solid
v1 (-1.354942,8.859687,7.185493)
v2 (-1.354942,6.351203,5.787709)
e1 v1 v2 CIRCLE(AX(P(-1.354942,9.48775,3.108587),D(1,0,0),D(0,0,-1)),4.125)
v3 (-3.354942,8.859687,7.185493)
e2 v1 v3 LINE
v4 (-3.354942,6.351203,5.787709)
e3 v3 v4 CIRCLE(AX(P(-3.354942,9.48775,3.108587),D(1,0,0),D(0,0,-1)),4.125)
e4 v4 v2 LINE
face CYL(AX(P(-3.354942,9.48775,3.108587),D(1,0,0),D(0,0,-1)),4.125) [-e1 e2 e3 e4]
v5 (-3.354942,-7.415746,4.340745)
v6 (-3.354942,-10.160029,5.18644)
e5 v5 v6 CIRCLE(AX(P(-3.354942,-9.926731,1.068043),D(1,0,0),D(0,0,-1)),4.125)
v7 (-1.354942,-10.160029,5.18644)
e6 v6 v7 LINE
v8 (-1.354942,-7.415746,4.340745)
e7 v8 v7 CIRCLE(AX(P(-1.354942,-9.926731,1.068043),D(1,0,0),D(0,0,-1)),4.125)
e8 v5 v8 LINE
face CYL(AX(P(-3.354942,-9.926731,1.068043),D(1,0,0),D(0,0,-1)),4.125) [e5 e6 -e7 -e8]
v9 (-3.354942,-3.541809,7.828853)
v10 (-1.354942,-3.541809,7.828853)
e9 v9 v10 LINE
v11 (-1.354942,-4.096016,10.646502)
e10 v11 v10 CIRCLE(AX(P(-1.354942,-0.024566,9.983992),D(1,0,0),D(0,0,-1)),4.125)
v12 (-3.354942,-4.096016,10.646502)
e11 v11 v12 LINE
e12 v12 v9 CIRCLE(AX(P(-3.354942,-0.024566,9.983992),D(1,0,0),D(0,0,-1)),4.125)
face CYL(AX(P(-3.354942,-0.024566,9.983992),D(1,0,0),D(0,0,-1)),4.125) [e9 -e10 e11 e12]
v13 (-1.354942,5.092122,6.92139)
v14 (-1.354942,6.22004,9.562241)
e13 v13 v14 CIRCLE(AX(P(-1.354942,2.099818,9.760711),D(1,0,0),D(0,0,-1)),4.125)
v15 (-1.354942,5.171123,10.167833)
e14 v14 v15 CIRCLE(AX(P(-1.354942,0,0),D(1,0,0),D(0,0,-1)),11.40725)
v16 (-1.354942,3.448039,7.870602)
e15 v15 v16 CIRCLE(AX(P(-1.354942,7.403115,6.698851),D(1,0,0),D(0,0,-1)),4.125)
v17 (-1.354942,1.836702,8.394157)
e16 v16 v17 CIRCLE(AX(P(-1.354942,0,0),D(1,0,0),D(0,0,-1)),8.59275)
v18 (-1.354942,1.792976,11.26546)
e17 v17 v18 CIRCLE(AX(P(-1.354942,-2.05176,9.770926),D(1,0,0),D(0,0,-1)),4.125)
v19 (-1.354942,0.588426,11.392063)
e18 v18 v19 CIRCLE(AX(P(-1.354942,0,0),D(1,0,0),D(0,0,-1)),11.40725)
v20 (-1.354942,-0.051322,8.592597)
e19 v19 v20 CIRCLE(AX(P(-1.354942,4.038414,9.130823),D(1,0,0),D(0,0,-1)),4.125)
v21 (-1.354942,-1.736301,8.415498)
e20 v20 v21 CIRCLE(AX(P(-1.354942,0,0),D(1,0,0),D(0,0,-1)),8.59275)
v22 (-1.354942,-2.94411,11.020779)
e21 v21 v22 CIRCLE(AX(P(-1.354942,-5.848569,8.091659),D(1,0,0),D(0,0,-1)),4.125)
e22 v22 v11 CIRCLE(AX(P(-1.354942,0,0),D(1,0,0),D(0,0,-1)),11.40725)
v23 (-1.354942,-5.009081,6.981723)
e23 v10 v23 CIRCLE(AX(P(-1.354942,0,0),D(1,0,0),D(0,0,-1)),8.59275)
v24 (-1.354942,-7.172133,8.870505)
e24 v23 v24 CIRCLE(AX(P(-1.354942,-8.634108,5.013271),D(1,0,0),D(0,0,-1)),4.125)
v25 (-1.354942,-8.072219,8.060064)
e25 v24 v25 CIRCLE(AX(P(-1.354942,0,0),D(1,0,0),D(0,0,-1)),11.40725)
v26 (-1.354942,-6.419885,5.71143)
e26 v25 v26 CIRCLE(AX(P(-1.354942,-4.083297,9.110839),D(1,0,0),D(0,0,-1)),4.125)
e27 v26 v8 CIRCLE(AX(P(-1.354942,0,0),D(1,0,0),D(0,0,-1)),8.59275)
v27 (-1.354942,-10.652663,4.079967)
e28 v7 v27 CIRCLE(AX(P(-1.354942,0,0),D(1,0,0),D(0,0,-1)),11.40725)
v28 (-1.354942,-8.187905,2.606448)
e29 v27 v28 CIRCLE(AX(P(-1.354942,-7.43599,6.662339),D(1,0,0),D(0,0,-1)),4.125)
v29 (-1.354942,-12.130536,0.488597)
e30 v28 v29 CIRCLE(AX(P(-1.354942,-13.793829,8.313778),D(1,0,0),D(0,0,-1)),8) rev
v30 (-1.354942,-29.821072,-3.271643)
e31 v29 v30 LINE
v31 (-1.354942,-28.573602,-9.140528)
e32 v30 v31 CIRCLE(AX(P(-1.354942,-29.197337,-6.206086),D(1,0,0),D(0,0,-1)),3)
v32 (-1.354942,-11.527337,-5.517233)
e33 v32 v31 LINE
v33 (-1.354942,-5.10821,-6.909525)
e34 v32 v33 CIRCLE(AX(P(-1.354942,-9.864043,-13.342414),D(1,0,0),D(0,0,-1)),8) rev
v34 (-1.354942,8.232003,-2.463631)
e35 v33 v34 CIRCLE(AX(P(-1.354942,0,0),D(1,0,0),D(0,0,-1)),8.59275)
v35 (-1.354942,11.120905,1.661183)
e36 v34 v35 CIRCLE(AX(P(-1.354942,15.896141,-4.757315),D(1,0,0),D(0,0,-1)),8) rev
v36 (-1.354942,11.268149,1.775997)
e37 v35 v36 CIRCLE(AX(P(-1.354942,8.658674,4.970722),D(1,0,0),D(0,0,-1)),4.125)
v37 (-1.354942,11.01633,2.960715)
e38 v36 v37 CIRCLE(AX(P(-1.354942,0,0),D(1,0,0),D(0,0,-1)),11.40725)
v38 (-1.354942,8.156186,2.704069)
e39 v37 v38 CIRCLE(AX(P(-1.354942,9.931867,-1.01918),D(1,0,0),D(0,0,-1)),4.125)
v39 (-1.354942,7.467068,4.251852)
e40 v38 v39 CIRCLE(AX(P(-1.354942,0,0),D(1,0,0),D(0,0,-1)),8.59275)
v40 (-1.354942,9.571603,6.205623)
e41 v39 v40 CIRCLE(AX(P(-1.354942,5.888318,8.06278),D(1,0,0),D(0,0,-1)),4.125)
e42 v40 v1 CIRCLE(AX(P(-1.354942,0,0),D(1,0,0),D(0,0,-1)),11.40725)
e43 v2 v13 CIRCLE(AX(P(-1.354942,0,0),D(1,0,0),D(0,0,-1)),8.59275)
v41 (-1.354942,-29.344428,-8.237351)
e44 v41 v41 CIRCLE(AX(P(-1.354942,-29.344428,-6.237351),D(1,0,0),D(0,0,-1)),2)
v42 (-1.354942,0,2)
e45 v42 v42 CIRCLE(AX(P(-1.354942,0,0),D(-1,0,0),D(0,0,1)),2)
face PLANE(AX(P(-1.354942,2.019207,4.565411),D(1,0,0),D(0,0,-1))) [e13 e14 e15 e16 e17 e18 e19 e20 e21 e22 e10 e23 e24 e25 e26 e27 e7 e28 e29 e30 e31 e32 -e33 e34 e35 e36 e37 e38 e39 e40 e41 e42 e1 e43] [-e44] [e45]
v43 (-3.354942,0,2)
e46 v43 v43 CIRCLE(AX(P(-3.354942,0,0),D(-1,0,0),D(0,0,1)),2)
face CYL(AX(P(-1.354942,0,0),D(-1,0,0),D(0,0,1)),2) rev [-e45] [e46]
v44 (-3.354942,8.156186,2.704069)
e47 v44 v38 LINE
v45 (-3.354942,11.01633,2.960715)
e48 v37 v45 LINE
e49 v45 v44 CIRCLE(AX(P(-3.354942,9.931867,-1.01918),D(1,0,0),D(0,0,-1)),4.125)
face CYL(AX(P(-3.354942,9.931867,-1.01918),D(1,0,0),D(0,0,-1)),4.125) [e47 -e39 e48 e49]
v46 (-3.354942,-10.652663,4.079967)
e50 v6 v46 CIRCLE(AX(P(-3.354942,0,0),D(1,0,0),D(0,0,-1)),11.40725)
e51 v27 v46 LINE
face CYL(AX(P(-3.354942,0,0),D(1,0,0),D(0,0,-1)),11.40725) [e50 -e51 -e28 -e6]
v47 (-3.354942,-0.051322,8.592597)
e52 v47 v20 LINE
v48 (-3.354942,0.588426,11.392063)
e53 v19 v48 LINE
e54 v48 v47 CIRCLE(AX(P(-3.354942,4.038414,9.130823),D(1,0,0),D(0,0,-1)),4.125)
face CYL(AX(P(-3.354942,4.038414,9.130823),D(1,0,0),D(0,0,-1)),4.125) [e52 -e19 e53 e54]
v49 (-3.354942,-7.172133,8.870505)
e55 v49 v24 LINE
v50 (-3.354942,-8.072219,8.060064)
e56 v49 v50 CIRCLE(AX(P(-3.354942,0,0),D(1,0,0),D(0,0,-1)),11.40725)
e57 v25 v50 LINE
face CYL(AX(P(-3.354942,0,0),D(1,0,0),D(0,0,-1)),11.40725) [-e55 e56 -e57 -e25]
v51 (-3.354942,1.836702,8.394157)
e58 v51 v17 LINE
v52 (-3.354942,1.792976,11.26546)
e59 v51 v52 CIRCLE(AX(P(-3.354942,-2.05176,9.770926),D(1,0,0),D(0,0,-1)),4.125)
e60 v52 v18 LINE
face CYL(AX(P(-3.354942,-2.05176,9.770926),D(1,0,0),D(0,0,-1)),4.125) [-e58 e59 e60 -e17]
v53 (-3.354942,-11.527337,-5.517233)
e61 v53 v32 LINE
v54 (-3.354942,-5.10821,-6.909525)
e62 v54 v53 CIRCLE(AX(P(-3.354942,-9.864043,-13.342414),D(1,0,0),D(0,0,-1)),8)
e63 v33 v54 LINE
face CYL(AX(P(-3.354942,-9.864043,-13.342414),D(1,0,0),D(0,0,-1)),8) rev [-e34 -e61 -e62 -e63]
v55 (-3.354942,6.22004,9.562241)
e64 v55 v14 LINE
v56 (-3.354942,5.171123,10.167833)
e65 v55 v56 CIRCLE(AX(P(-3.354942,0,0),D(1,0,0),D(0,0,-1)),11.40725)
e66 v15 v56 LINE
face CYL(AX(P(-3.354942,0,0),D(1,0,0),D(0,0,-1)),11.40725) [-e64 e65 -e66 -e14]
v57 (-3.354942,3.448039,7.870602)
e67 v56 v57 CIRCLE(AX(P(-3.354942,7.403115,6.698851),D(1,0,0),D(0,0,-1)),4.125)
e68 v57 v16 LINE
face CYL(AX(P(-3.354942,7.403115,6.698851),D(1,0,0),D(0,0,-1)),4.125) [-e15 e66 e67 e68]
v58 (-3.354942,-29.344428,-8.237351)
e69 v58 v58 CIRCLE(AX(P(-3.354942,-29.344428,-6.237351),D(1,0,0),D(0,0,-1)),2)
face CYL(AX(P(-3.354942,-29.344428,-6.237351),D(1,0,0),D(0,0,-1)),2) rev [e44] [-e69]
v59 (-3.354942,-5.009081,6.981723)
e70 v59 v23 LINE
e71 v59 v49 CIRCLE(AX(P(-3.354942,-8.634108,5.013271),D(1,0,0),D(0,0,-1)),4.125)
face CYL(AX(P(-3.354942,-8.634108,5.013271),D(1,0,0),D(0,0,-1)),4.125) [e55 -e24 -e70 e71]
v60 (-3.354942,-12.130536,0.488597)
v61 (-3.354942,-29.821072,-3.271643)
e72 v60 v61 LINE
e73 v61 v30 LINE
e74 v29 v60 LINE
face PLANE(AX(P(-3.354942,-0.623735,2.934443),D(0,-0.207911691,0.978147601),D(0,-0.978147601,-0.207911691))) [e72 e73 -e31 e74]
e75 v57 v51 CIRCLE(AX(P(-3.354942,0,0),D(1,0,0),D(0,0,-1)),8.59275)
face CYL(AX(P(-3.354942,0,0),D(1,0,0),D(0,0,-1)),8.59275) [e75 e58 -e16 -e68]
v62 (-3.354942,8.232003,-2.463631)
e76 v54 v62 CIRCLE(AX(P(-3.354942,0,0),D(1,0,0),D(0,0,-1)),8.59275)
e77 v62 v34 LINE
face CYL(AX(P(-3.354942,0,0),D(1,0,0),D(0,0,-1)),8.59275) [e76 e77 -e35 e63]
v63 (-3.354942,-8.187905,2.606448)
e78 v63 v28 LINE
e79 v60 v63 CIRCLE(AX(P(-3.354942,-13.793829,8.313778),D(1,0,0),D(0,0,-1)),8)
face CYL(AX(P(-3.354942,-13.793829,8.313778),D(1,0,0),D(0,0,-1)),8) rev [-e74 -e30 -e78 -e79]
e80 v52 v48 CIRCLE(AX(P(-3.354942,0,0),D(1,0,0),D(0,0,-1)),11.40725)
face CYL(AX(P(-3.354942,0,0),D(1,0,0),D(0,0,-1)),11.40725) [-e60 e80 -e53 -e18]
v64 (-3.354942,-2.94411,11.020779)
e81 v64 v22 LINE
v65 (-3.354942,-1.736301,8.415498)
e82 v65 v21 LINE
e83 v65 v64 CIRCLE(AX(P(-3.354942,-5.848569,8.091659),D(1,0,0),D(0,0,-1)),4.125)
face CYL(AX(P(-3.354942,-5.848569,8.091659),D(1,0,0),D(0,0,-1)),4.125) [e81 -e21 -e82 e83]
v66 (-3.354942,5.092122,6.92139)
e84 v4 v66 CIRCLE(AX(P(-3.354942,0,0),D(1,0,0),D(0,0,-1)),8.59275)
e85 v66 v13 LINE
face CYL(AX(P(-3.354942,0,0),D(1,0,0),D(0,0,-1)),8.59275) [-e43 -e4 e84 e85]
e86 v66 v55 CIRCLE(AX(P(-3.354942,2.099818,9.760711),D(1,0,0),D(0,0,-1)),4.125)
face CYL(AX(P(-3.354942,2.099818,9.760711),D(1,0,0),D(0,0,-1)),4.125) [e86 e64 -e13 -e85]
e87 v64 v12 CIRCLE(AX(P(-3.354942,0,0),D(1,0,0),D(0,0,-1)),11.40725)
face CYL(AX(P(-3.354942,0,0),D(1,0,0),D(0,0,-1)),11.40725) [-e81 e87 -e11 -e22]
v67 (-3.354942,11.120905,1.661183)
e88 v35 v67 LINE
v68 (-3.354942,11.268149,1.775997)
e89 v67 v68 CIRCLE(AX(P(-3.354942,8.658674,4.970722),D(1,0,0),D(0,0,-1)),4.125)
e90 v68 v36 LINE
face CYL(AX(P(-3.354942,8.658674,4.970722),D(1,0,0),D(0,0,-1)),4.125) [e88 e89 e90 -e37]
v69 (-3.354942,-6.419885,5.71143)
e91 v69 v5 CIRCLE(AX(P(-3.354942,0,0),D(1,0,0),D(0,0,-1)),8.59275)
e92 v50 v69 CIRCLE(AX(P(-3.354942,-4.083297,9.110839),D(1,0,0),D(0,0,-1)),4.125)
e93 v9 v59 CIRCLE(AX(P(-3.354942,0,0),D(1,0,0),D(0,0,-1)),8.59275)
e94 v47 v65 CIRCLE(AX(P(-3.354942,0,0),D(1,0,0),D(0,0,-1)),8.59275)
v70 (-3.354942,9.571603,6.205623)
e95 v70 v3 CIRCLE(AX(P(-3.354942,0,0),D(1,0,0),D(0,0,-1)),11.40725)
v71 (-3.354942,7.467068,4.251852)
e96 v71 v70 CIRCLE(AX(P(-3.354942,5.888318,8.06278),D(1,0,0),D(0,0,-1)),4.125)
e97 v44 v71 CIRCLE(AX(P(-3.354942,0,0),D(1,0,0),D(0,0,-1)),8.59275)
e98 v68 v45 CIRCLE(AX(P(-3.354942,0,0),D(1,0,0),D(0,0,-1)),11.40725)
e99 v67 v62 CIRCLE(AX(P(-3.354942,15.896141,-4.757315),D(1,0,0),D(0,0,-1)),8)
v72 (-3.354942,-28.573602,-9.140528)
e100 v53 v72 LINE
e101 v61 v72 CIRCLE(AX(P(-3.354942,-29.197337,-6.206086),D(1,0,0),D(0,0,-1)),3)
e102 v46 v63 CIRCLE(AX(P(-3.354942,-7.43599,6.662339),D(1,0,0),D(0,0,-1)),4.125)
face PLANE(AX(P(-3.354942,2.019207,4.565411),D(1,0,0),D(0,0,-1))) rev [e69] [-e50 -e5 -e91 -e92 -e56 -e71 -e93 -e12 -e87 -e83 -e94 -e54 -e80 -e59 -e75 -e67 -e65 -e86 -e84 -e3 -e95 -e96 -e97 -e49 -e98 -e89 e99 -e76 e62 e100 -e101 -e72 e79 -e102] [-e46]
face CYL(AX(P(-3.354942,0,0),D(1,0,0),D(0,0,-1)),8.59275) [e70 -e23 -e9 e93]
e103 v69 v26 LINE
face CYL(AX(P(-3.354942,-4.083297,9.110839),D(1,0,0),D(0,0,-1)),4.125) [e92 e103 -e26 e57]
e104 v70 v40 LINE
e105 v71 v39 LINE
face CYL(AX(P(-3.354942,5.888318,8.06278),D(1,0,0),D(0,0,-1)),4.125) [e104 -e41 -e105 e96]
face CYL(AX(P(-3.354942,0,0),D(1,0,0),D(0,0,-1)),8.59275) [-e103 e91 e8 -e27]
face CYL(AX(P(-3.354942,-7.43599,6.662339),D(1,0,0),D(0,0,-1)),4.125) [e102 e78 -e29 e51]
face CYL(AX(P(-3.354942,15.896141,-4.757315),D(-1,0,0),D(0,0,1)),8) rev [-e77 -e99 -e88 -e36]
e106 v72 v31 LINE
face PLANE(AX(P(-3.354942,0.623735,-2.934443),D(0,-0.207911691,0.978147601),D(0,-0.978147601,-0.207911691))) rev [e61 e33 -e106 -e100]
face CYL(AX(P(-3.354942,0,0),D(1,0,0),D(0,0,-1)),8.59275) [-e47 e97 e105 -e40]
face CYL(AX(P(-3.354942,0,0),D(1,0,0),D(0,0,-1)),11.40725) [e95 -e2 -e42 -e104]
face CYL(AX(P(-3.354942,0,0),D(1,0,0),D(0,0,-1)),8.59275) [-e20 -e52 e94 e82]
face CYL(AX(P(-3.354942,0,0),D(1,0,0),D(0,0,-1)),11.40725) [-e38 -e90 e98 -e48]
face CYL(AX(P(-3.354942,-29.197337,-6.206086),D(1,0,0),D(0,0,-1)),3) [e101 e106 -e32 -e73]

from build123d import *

# Parameters (mm, degrees)
SKETCH1_R           = 1.5
BOSS_EXTRUDE1_DEPTH = 2
SKETCH3_OUTSIDE_W   = 31.914
SKETCH3_OUTSIDE_H   = 31.796
SKETCH3_OUTSIDE_R   = 11.40725
CUT_EXTRUDE1_DEPTH  = 17.630863493
SKETCH4_R           = 2
CUT_EXTRUDE2_DEPTH  = 17.245136509
BOSS_EXTRUDE3_DEPTH = 2
CUT_EXTRUDE3_DEPTH  = 35.211805454
FILLET1_R           = 8


with BuildPart() as part:
    # Sketch1 → Boss-Extrude1 (new body)
    with BuildSketch(Plane(origin=(-1.354941904, 0, 0), x_dir=(0, 0, -1), z_dir=(1, 0, 0))):
        with BuildLine():
            ThreePointArc((-11.66138775, 0.780827758), (-10.210393031, 0.057188521), (-8.592596732, -0.051322118))
            ThreePointArc((-8.592596732, -0.051322118), (-8.545678016, -0.898186953), (-8.415498346, -1.736300708))
            ThreePointArc((-8.415498346, -1.736300708), (-9.975381284, -2.178798893), (-11.24421523, -3.188303642))
            ThreePointArc((-11.24421523, -3.188303642), (-11.115473034, -3.611636122), (-10.97079907, -4.029792056))
            ThreePointArc((-10.97079907, -4.029792056), (-9.350918841, -4.100696673), (-7.828853128, -3.541809038))
            ThreePointArc((-7.828853128, -3.541809038), (-7.441539788, -4.296375), (-6.981723166, -5.009081172))
            ThreePointArc((-6.981723166, -5.009081172), (-8.226766912, -6.047784929), (-8.975301827, -7.486094667))
            ThreePointArc((-8.975301827, -7.486094667), (-8.685505148, -7.820463962), (-8.383259564, -8.143624213))
            ThreePointArc((-8.383259564, -8.143624213), (-6.874585833, -7.549534157), (-5.711429695, -6.419884999))
            ThreePointArc((-5.711429695, -6.419884999), (-5.050691727, -6.951680778), (-4.340744624, -7.415745996))
            ThreePointArc((-4.340744624, -7.415745996), (-5.055669804, -8.871054007), (-5.154477201, -10.489471914))
            ThreePointArc((-5.154477201, -10.489471914), (-4.753734516, -10.677062536), (-4.34617832, -10.849349762))
            ThreePointArc((-4.34617832, -10.849349762), (-3.209574481, -9.692988601), (-2.606448181, -8.187904521))
            ThreePointArc((-2.606448181, -8.187904521), (-1.786533181, -8.404977796), (-0.949211902, -8.540160966))
            ThreePointArc((-0.949211902, -8.540160966), (-1.010401457, -10.160437258), (-0.442396639, -11.679124174))
            ThreePointArc((-0.442396639, -11.679124174), (0, -11.6875), (0.442396639, -11.679124174))
            ThreePointArc((0.442396639, -11.679124174), (1.010401457, -10.160437258), (0.949211902, -8.540160966))
            ThreePointArc((0.949211902, -8.540160966), (1.786533181, -8.404977796), (2.606448181, -8.187904521))
            ThreePointArc((2.606448181, -8.187904521), (3.209574481, -9.692988601), (4.34617832, -10.849349762))
            ThreePointArc((4.34617832, -10.849349762), (4.753734516, -10.677062536), (5.154477201, -10.489471914))
            ThreePointArc((5.154477201, -10.489471914), (5.055669804, -8.871054007), (4.340744624, -7.415745996))
            ThreePointArc((4.340744624, -7.415745996), (5.050691727, -6.951680778), (5.711429695, -6.419884999))
            ThreePointArc((5.711429695, -6.419884999), (6.874585833, -7.549534157), (8.383259564, -8.143624213))
            ThreePointArc((8.383259564, -8.143624213), (8.685505148, -7.820463962), (8.975301827, -7.486094667))
            ThreePointArc((8.975301827, -7.486094667), (8.226766912, -6.047784929), (6.981723166, -5.009081172))
            ThreePointArc((6.981723166, -5.009081172), (7.441539788, -4.296375), (7.828853128, -3.541809038))
            ThreePointArc((7.828853128, -3.541809038), (9.350918841, -4.100696673), (10.97079907, -4.029792056))
            ThreePointArc((10.97079907, -4.029792056), (11.115473034, -3.611636122), (11.24421523, -3.188303642))
            ThreePointArc((11.24421523, -3.188303642), (9.975381284, -2.178798893), (8.415498346, -1.736300708))
            ThreePointArc((8.415498346, -1.736300708), (8.545678016, -0.898186953), (8.592596732, -0.051322118))
            ThreePointArc((8.592596732, -0.051322118), (10.210393031, 0.057188521), (11.66138775, 0.780827758))
            ThreePointArc((11.66138775, 0.780827758), (11.623474652, 1.221676414), (11.568901669, 1.660774047))
            ThreePointArc((11.568901669, 1.660774047), (9.999161608, 2.066921265), (8.394157409, 1.836701922))
            ThreePointArc((8.394157409, 1.836701922), (8.17219088, 2.655305778), (7.8706023, 3.448038862))
            ThreePointArc((7.8706023, 3.448038862), (9.304397507, 4.205185299), (10.335616548, 5.456435359))
            ThreePointArc((10.335616548, 5.456435359), (10.121671907, 5.84375), (9.893219909, 6.222688815))
            ThreePointArc((9.893219909, 6.222688815), (8.29399605, 5.955251959), (6.921390398, 5.092122104))
            ThreePointArc((6.921390398, 5.092122104), (6.385657699, 5.749672018), (5.787709228, 6.351202599))
            ThreePointArc((5.787709228, 6.351202599), (6.789587127, 7.626067336), (7.222723349, 9.188575716))
            ThreePointArc((7.222723349, 9.188575716), (6.869740136, 9.455386122), (6.506910549, 9.708644156))
            ThreePointArc((6.506910549, 9.708644156), (5.154723227, 8.813865487), (4.251852108, 7.467068114))
            ThreePointArc((4.251852108, 7.467068114), (3.49498629, 7.849867731), (2.704068651, 8.156185707))
            ThreePointArc((2.704068651, 8.156185707), (3.100795451, 9.728333051), (2.860955666, 11.331927856))
            ThreePointArc((2.860955666, 11.331927856), (2.429967886, 11.432100084), (1.995497243, 11.515886722))
            ThreePointArc((1.995497243, 11.515886722), (1.124151929, 10.148481601), (0.847129962, 8.55089021))
            ThreePointArc((0.847129962, 8.55089021), (0, 8.59275), (-0.847129962, 8.55089021))
            ThreePointArc((-0.847129962, 8.55089021), (-1.124151929, 10.148481601), (-1.995497243, 11.515886722))
            ThreePointArc((-1.995497243, 11.515886722), (-2.429967886, 11.432100084), (-2.860955666, 11.331927856))
            ThreePointArc((-2.860955666, 11.331927856), (-3.100795451, 9.728333051), (-2.704068651, 8.156185707))
            ThreePointArc((-2.704068651, 8.156185707), (-3.49498629, 7.849867731), (-4.251852108, 7.467068114))
            ThreePointArc((-4.251852108, 7.467068114), (-5.154723227, 8.813865487), (-6.506910549, 9.708644156))
            ThreePointArc((-6.506910549, 9.708644156), (-6.869740136, 9.455386122), (-7.222723349, 9.188575716))
            ThreePointArc((-7.222723349, 9.188575716), (-6.789587127, 7.626067336), (-5.787709228, 6.351202599))
            ThreePointArc((-5.787709228, 6.351202599), (-6.385657699, 5.749672018), (-6.921390398, 5.092122104))
            ThreePointArc((-6.921390398, 5.092122104), (-8.29399605, 5.955251959), (-9.893219909, 6.222688815))
            ThreePointArc((-9.893219909, 6.222688815), (-10.121671907, 5.84375), (-10.335616548, 5.456435359))
            ThreePointArc((-10.335616548, 5.456435359), (-9.304397507, 4.205185299), (-7.8706023, 3.448038862))
            ThreePointArc((-7.8706023, 3.448038862), (-8.17219088, 2.655305778), (-8.394157409, 1.836701922))
            ThreePointArc((-8.394157409, 1.836701922), (-9.999161608, 2.066921265), (-11.568901669, 1.660774047))
            ThreePointArc((-11.568901669, 1.660774047), (-11.623474652, 1.221676414), (-11.66138775, 0.780827758))
        make_face()
        with Locations(Location((0, 0, 0), (0, 0, 180))):
            Circle(SKETCH1_R, mode=Mode.SUBTRACT)
    extrude(amount=-BOSS_EXTRUDE1_DEPTH)

    # Sketch3 outside → Cut-Extrude1 (cut, through all)
    with BuildSketch(Plane(origin=(-1.354941904, 0, 0), x_dir=(0, 0, -1), z_dir=(1, 0, 0))):
        with Locations((0, -0.086)):
            Rectangle(SKETCH3_OUTSIDE_W, SKETCH3_OUTSIDE_H)
        Circle(SKETCH3_OUTSIDE_R, mode=Mode.SUBTRACT)
    extrude(amount=-CUT_EXTRUDE1_DEPTH, mode=Mode.SUBTRACT)

    # Sketch4 → Cut-Extrude2 (cut, through all)
    with BuildSketch(Plane.ZY.offset(3.354941904)):
        Circle(SKETCH4_R)
    extrude(amount=-CUT_EXTRUDE2_DEPTH, mode=Mode.SUBTRACT)

    # Sketch5 → Boss-Extrude3 (add)
    with BuildSketch(Plane(origin=(-1.354941904, 0, 0), x_dir=(0, 0, -1), z_dir=(1, 0, 0))):
        with BuildLine():
            Line((5.821527343, -27.388132821), (0.895701941, -4.213946322))
            Line((0.895701941, -4.213946322), (-2.171319843, -4.213946322))
            Line((-2.171319843, -4.213946322), (3.27164281, -29.821072303))
            ThreePointArc((3.27164281, -29.821072303), (4.572168507, -31.713348935), (6.829820684, -32.131780033))
            Line((6.829820684, -32.131780033), (6.653174106, -31.300723223))
            ThreePointArc((6.653174106, -31.300723223), (4.281055523, -29.760251404), (5.821527343, -27.388132821))
        make_face()
        with BuildLine():
            Line((3.962723726, -4.213946322), (0.895701941, -4.213946322))
            Line((0.895701941, -4.213946322), (5.821527343, -27.388132821))
            ThreePointArc((5.821527343, -27.388132821), (7.495991507, -27.790136099), (8.237350725, -29.344428022))
            ThreePointArc((8.237350725, -29.344428022), (7.791642647, -30.603068804), (6.653174106, -31.300723223))
            Line((6.653174106, -31.300723223), (6.829820684, -32.131780033))
            ThreePointArc((6.829820684, -32.131780033), (8.722097316, -30.831254336), (9.140528414, -28.573602159))
            Line((9.140528414, -28.573602159), (3.962723726, -4.213946322))
        make_face()
    extrude(amount=-BOSS_EXTRUDE3_DEPTH)

    # Sketch6 → Cut-Extrude3 (cut, through all)
    with BuildSketch(Plane(origin=(-1.354941904, 0, 0), x_dir=(0, 0, -1), z_dir=(1, 0, 0))):
        with BuildLine():
            ThreePointArc((4.60855611, -7.252348802), (8.250847615, 2.39976378), (0, 8.59275))
            Line((0, 8.59275), (0, 11.449359201))
            ThreePointArc((0, 11.449359201), (11.128561829, 2.691270657), (5.231728933, -10.184146429))
            Line((5.231728933, -10.184146429), (4.60855611, -7.252348802))
        make_face()
        with BuildLine():
            ThreePointArc((-1.878840334, -8.384826269), (-1.570637651, -8.447984963), (-1.260329494, -8.499818947))
            Line((-1.260329494, -8.499818947), (-0.637156671, -11.431616574))
            ThreePointArc((-0.637156671, -11.431616574), (-1.575646482, -11.340421698), (-2.503449753, -11.172312449))
            Line((-2.503449753, -11.172312449), (-1.878840334, -8.384826269))
        make_face()
    extrude(amount=-CUT_EXTRUDE3_DEPTH, mode=Mode.SUBTRACT)

    # Fillet1
    # the kernel refuses this fillet: 8 mm, written as the material it adds along each edge
    with BuildSketch(Plane(origin=(-3.354941904, -8.499818947, 1.260329494), x_dir=(0, -0.978147600733804, -0.20791169081776692), z_dir=(1, 0, 0))) as fillet1_piece_1:
        with BuildLine():
            CenterArc((3.711828979, -8), FILLET1_R, 90, 32.486450305)
            Line((-0.58497216, -1.251852108), (-0.670908182, -1.11688915))
            ThreePointArc((-0.670908182, -1.11688915), (-0.412236702, -0.569968342), (-0.149931796, 0.055861046))
            Line((-0.149931796, 0.055861046), (0, 0.16))
            Line((0, 0.16), (3.711828979, 0.16))
            Line((3.711828979, 0.16), (3.711828979, 0))
        make_face()
    extrude(amount=2)
    with BuildSketch(Plane(origin=(-3.354941904, -7.252348802, -4.60855611), x_dir=(0, 0.6817347093363165, -0.7315994710810882), z_dir=(1, 0, 0))) as fillet1_piece_2:
        with BuildLine():
            CenterArc((4.609202788, -7.864888151), FILLET1_R, 100.545143381, 48.475508098)
            Line((-2.24962028, -3.747055453), (-2.386796741, -3.664698799))
            Line((-2.386796741, -3.664698799), (-0.137176461, 0.082356654))
            Line((-0.137176461, 0.082356654), (0.029281628, 0.157297763))
            ThreePointArc((0.029281628, 0.157297763), (1.57256069, 0.014877208), (3.115839752, 0.157297763))
            Line((3.115839752, 0.157297763), (3.14512138, 0))
        make_face()
    extrude(amount=2)
    with BuildSketch(Plane(origin=(-1.354941904, 8.55089021, 0.847129962), x_dir=(0, 0.9533192219499187, 0.3019643373989743), z_dir=(-1, 0, 0))) as fillet1_piece_3:
        with BuildLine():
            CenterArc((5.310026661, 7.560828727), FILLET1_R, 214.236741242, 36.690361487)
            Line((-1.30373306, 3.059919669), (-1.436008254, 2.969901488))
            ThreePointArc((-1.436008254, 2.969901488), (-0.64959553, 1.530927434), (-0.156551158, -0.03304141))
            Line((-0.156551158, -0.03304141), (0.052283339, -0.151216575))
            ThreePointArc((0.052283339, -0.151216575), (1.347929845, 0.066447687), (2.64357635, -0.151216575))
            Line((2.64357635, -0.151216575), (2.69585969, 0))
        make_face()
    extrude(amount=2)


solid = part.part
